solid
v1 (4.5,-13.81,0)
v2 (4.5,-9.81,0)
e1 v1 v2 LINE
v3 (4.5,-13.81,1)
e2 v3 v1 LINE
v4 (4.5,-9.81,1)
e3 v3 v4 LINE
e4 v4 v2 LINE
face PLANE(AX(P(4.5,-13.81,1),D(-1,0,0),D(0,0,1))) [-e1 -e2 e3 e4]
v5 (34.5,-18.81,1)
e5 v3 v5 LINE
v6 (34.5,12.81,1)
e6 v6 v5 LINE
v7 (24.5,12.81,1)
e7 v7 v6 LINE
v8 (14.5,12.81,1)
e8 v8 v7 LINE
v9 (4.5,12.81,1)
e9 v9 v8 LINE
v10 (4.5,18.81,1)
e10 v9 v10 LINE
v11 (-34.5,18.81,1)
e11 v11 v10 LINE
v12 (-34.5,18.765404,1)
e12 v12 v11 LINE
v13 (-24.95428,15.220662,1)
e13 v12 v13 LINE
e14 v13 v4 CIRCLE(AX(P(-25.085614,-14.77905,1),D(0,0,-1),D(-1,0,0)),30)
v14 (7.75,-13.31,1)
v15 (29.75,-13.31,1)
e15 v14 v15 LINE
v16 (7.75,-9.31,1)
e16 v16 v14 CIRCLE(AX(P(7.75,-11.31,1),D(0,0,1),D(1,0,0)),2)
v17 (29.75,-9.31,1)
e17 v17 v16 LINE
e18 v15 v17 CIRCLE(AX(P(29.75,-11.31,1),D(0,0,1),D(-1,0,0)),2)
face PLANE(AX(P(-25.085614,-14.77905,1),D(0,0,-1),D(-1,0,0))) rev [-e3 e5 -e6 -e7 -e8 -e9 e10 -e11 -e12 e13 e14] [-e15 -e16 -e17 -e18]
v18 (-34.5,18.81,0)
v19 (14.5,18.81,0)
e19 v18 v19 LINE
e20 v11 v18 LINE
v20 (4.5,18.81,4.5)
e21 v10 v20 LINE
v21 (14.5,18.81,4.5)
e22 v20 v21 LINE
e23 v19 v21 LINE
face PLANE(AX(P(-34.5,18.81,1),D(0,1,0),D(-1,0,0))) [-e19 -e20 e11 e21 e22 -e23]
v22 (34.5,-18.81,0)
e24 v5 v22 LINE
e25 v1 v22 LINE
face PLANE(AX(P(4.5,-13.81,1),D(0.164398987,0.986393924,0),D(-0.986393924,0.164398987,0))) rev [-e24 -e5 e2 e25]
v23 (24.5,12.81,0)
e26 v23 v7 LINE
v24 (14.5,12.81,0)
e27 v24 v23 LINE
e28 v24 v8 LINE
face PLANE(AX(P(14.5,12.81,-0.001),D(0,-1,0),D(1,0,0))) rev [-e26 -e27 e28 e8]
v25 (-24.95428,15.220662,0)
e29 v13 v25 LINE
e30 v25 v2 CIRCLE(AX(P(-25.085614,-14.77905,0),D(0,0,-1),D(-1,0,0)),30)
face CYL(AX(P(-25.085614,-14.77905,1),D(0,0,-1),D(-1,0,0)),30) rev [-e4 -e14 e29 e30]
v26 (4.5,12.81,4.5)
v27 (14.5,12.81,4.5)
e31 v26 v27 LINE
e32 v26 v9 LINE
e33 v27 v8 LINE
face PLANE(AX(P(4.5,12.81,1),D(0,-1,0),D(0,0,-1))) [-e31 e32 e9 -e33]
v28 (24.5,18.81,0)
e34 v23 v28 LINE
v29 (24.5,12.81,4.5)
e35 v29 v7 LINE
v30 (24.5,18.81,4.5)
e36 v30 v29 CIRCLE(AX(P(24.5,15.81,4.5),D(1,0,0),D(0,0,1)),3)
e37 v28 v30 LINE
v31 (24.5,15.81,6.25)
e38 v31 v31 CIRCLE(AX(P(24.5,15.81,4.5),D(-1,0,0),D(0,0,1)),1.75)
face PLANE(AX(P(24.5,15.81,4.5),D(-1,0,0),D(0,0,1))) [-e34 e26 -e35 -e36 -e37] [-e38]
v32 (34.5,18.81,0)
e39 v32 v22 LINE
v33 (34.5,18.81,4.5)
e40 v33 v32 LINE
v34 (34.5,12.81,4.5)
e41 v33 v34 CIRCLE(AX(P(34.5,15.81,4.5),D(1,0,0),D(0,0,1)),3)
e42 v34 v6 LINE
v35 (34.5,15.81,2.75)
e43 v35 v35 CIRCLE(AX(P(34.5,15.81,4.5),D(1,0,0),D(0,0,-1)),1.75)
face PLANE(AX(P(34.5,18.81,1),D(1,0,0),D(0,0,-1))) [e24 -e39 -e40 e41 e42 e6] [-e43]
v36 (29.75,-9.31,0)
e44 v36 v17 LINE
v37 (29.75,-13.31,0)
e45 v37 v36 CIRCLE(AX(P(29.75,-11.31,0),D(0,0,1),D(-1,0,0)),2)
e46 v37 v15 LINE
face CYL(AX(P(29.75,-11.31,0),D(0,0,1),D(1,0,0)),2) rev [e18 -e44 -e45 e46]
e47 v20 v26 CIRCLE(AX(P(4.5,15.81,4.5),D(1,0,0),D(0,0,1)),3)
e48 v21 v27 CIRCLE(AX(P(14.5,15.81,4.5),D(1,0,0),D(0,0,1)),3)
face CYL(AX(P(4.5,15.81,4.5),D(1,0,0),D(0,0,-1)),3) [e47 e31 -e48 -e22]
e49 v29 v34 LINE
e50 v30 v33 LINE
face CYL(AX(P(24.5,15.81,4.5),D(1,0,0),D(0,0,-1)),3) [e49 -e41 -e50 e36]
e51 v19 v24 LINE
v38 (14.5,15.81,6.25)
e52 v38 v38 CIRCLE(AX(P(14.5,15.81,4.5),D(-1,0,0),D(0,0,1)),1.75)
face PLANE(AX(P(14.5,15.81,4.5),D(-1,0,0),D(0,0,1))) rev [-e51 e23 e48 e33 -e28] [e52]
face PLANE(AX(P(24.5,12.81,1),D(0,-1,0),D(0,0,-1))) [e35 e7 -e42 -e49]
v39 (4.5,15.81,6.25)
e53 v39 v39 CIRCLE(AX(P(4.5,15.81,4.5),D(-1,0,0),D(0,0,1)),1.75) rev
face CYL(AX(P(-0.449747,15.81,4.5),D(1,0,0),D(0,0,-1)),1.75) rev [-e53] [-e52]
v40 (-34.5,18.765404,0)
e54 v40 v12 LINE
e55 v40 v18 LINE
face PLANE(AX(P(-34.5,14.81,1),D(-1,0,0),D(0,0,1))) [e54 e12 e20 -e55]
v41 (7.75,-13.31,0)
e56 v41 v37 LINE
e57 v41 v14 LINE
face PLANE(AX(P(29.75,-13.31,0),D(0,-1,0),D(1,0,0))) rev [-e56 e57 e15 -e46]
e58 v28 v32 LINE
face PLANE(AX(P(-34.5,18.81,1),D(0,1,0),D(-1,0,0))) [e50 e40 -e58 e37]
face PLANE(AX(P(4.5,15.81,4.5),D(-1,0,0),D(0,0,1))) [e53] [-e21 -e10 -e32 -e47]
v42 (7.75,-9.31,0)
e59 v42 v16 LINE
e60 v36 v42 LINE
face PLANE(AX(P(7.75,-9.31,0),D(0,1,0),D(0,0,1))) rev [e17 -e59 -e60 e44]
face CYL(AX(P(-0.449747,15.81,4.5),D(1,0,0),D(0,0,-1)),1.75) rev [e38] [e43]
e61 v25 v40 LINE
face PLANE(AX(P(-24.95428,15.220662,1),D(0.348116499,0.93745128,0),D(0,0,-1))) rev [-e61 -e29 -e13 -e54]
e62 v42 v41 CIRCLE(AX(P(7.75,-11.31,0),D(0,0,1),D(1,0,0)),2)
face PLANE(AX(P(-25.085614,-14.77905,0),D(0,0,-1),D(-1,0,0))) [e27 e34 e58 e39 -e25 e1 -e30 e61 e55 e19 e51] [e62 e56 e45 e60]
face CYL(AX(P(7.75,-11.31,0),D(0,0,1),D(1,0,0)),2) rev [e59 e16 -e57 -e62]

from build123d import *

# Parameters (mm, degrees)
BOSS_EXTRUDE1_DEPTH = 1
CUT_EXTRUDE1_DEPTH  = 40.307328833
BOSS_EXTRUDE2_DEPTH = 10
LPATTERN1_COUNT     = 2
LPATTERN1_PITCH     = 20
CUT_EXTRUDE2_REACH  = 73.91
SKETCH4_R           = 1.75
CUT_EXTRUDE3_REACH  = 41.829
SKETCH5_W           = 10
SKETCH5_H           = 6
CHAMFER1_START      = -11.379677933
CHAMFER1_OUTLINE_W  = 13
CHAMFER1_OUTLINE_H  = 2
CHAMFER1_DEPTH      = 16.961310673


with BuildPart() as part:
    # Sketch1 → Boss-Extrude1 (new body)
    with BuildSketch(Plane.XY):
        with BuildLine():
            Line((4.5, -13.81), (34.5, -18.81))
            Line((34.5, -18.81), (34.5, 18.81))
            Line((34.5, 18.81), (-34.5, 18.81))
            Line((-34.5, 18.81), (-34.5, 14.81))
            Line((-34.5, 14.81), (-26.5, 15.18758956))
            ThreePointArc((-26.5, 15.18758956), (-6.254140463, 8.574228065), (4.5, -9.81))
            Line((4.5, -9.81), (4.5, -13.81))
        make_face()
    extrude(amount=BOSS_EXTRUDE1_DEPTH)

    # Sketch2 → Cut-Extrude1 (cut, through all)
    with BuildSketch(Plane.XY.offset(1)):
        with BuildLine():
            Line((7.75, -9.31), (29.75, -9.31))
            ThreePointArc((29.75, -9.31), (31.75, -11.31), (29.75, -13.31))
            Line((29.75, -13.31), (7.75, -13.31))
            ThreePointArc((7.75, -13.31), (5.75, -11.31), (7.75, -9.31))
        make_face()
    extrude(amount=-CUT_EXTRUDE1_DEPTH, mode=Mode.SUBTRACT)

    # Sketch3 → Boss-Extrude2 (add)
    with BuildSketch(Plane(origin=(34.5, 0, 0), x_dir=(0, 0, -1), z_dir=(1, 0, 0))):
        with BuildLine():
            Line((-1, 18.81), (-4.5, 18.81))
            ThreePointArc((-4.5, 18.81), (-7.5, 15.81), (-4.5, 12.81))
            Line((-4.5, 12.81), (-1, 12.81))
            Line((-1, 12.81), (-1, 18.81))
        make_face()
    boss_extrude2 = extrude(amount=-BOSS_EXTRUDE2_DEPTH)

    # LPattern1: Boss-Extrude2 ×2
    with Locations(*[(-i * LPATTERN1_PITCH, 0, 0) for i in range(1, LPATTERN1_COUNT)]):
        add(boss_extrude2)

    # Cut-Extrude2: up to this face of the body (flat: up to its plane)
    cut_extrude2_end = Plane(part.part.faces().sort_by_distance((4.5, 15.81, 3.966377012))[0])
    # Sketch4 → Cut-Extrude2 (cut, up to the picked face)
    with BuildSketch(Plane(origin=(34.5, 0, 0), x_dir=(0, 0, -1), z_dir=(1, 0, 0)), mode=Mode.PRIVATE) as cut_extrude2_sk1:
        with Locations(Location((-4.5, 15.81, 0), (0, 0, 180))):
            Circle(SKETCH4_R)
    cut_extrude2_tool1 = split(extrude(cut_extrude2_sk1.sketch, amount=-CUT_EXTRUDE2_REACH, mode=Mode.PRIVATE), bisect_by=cut_extrude2_end, keep=Keep.BOTH, mode=Mode.PRIVATE)
    add(cut_extrude2_tool1.solids().sort_by(Axis((34.5, 15.81, 4.5), (-1, 0, 0)))[0], mode=Mode.SUBTRACT)

    # Sketch5 → Cut-Extrude3 (cut, up to next)
    with BuildSketch(Plane.XY.offset(1), mode=Mode.PRIVATE) as cut_extrude3_sk1:
        with Locations((19.5, 15.81)):
            Rectangle(SKETCH5_W, SKETCH5_H)
    cut_extrude3_tool1 = extrude(cut_extrude3_sk1.sketch, amount=-CUT_EXTRUDE3_REACH, mode=Mode.PRIVATE) & part.part
    add(cut_extrude3_tool1.solids().sort_by_distance((19.5, 15.81, 1))[0], mode=Mode.SUBTRACT)

    # Chamfer1: read off the stored shape, not the designer's step
    # Chamfer1 outline → Chamfer1 (cut)
    with BuildSketch(Plane(origin=(0, 0, 0), x_dir=(0.937451280255772, -0.34811649938894607, 0), z_dir=(0.34811649938894607, 0.9374512802557721, 0)).offset(CHAMFER1_START)):
        with Locations((-33.5, 0)):
            Rectangle(CHAMFER1_OUTLINE_W, CHAMFER1_OUTLINE_H)
    extrude(amount=CHAMFER1_DEPTH, mode=Mode.SUBTRACT)


solid = part.part
